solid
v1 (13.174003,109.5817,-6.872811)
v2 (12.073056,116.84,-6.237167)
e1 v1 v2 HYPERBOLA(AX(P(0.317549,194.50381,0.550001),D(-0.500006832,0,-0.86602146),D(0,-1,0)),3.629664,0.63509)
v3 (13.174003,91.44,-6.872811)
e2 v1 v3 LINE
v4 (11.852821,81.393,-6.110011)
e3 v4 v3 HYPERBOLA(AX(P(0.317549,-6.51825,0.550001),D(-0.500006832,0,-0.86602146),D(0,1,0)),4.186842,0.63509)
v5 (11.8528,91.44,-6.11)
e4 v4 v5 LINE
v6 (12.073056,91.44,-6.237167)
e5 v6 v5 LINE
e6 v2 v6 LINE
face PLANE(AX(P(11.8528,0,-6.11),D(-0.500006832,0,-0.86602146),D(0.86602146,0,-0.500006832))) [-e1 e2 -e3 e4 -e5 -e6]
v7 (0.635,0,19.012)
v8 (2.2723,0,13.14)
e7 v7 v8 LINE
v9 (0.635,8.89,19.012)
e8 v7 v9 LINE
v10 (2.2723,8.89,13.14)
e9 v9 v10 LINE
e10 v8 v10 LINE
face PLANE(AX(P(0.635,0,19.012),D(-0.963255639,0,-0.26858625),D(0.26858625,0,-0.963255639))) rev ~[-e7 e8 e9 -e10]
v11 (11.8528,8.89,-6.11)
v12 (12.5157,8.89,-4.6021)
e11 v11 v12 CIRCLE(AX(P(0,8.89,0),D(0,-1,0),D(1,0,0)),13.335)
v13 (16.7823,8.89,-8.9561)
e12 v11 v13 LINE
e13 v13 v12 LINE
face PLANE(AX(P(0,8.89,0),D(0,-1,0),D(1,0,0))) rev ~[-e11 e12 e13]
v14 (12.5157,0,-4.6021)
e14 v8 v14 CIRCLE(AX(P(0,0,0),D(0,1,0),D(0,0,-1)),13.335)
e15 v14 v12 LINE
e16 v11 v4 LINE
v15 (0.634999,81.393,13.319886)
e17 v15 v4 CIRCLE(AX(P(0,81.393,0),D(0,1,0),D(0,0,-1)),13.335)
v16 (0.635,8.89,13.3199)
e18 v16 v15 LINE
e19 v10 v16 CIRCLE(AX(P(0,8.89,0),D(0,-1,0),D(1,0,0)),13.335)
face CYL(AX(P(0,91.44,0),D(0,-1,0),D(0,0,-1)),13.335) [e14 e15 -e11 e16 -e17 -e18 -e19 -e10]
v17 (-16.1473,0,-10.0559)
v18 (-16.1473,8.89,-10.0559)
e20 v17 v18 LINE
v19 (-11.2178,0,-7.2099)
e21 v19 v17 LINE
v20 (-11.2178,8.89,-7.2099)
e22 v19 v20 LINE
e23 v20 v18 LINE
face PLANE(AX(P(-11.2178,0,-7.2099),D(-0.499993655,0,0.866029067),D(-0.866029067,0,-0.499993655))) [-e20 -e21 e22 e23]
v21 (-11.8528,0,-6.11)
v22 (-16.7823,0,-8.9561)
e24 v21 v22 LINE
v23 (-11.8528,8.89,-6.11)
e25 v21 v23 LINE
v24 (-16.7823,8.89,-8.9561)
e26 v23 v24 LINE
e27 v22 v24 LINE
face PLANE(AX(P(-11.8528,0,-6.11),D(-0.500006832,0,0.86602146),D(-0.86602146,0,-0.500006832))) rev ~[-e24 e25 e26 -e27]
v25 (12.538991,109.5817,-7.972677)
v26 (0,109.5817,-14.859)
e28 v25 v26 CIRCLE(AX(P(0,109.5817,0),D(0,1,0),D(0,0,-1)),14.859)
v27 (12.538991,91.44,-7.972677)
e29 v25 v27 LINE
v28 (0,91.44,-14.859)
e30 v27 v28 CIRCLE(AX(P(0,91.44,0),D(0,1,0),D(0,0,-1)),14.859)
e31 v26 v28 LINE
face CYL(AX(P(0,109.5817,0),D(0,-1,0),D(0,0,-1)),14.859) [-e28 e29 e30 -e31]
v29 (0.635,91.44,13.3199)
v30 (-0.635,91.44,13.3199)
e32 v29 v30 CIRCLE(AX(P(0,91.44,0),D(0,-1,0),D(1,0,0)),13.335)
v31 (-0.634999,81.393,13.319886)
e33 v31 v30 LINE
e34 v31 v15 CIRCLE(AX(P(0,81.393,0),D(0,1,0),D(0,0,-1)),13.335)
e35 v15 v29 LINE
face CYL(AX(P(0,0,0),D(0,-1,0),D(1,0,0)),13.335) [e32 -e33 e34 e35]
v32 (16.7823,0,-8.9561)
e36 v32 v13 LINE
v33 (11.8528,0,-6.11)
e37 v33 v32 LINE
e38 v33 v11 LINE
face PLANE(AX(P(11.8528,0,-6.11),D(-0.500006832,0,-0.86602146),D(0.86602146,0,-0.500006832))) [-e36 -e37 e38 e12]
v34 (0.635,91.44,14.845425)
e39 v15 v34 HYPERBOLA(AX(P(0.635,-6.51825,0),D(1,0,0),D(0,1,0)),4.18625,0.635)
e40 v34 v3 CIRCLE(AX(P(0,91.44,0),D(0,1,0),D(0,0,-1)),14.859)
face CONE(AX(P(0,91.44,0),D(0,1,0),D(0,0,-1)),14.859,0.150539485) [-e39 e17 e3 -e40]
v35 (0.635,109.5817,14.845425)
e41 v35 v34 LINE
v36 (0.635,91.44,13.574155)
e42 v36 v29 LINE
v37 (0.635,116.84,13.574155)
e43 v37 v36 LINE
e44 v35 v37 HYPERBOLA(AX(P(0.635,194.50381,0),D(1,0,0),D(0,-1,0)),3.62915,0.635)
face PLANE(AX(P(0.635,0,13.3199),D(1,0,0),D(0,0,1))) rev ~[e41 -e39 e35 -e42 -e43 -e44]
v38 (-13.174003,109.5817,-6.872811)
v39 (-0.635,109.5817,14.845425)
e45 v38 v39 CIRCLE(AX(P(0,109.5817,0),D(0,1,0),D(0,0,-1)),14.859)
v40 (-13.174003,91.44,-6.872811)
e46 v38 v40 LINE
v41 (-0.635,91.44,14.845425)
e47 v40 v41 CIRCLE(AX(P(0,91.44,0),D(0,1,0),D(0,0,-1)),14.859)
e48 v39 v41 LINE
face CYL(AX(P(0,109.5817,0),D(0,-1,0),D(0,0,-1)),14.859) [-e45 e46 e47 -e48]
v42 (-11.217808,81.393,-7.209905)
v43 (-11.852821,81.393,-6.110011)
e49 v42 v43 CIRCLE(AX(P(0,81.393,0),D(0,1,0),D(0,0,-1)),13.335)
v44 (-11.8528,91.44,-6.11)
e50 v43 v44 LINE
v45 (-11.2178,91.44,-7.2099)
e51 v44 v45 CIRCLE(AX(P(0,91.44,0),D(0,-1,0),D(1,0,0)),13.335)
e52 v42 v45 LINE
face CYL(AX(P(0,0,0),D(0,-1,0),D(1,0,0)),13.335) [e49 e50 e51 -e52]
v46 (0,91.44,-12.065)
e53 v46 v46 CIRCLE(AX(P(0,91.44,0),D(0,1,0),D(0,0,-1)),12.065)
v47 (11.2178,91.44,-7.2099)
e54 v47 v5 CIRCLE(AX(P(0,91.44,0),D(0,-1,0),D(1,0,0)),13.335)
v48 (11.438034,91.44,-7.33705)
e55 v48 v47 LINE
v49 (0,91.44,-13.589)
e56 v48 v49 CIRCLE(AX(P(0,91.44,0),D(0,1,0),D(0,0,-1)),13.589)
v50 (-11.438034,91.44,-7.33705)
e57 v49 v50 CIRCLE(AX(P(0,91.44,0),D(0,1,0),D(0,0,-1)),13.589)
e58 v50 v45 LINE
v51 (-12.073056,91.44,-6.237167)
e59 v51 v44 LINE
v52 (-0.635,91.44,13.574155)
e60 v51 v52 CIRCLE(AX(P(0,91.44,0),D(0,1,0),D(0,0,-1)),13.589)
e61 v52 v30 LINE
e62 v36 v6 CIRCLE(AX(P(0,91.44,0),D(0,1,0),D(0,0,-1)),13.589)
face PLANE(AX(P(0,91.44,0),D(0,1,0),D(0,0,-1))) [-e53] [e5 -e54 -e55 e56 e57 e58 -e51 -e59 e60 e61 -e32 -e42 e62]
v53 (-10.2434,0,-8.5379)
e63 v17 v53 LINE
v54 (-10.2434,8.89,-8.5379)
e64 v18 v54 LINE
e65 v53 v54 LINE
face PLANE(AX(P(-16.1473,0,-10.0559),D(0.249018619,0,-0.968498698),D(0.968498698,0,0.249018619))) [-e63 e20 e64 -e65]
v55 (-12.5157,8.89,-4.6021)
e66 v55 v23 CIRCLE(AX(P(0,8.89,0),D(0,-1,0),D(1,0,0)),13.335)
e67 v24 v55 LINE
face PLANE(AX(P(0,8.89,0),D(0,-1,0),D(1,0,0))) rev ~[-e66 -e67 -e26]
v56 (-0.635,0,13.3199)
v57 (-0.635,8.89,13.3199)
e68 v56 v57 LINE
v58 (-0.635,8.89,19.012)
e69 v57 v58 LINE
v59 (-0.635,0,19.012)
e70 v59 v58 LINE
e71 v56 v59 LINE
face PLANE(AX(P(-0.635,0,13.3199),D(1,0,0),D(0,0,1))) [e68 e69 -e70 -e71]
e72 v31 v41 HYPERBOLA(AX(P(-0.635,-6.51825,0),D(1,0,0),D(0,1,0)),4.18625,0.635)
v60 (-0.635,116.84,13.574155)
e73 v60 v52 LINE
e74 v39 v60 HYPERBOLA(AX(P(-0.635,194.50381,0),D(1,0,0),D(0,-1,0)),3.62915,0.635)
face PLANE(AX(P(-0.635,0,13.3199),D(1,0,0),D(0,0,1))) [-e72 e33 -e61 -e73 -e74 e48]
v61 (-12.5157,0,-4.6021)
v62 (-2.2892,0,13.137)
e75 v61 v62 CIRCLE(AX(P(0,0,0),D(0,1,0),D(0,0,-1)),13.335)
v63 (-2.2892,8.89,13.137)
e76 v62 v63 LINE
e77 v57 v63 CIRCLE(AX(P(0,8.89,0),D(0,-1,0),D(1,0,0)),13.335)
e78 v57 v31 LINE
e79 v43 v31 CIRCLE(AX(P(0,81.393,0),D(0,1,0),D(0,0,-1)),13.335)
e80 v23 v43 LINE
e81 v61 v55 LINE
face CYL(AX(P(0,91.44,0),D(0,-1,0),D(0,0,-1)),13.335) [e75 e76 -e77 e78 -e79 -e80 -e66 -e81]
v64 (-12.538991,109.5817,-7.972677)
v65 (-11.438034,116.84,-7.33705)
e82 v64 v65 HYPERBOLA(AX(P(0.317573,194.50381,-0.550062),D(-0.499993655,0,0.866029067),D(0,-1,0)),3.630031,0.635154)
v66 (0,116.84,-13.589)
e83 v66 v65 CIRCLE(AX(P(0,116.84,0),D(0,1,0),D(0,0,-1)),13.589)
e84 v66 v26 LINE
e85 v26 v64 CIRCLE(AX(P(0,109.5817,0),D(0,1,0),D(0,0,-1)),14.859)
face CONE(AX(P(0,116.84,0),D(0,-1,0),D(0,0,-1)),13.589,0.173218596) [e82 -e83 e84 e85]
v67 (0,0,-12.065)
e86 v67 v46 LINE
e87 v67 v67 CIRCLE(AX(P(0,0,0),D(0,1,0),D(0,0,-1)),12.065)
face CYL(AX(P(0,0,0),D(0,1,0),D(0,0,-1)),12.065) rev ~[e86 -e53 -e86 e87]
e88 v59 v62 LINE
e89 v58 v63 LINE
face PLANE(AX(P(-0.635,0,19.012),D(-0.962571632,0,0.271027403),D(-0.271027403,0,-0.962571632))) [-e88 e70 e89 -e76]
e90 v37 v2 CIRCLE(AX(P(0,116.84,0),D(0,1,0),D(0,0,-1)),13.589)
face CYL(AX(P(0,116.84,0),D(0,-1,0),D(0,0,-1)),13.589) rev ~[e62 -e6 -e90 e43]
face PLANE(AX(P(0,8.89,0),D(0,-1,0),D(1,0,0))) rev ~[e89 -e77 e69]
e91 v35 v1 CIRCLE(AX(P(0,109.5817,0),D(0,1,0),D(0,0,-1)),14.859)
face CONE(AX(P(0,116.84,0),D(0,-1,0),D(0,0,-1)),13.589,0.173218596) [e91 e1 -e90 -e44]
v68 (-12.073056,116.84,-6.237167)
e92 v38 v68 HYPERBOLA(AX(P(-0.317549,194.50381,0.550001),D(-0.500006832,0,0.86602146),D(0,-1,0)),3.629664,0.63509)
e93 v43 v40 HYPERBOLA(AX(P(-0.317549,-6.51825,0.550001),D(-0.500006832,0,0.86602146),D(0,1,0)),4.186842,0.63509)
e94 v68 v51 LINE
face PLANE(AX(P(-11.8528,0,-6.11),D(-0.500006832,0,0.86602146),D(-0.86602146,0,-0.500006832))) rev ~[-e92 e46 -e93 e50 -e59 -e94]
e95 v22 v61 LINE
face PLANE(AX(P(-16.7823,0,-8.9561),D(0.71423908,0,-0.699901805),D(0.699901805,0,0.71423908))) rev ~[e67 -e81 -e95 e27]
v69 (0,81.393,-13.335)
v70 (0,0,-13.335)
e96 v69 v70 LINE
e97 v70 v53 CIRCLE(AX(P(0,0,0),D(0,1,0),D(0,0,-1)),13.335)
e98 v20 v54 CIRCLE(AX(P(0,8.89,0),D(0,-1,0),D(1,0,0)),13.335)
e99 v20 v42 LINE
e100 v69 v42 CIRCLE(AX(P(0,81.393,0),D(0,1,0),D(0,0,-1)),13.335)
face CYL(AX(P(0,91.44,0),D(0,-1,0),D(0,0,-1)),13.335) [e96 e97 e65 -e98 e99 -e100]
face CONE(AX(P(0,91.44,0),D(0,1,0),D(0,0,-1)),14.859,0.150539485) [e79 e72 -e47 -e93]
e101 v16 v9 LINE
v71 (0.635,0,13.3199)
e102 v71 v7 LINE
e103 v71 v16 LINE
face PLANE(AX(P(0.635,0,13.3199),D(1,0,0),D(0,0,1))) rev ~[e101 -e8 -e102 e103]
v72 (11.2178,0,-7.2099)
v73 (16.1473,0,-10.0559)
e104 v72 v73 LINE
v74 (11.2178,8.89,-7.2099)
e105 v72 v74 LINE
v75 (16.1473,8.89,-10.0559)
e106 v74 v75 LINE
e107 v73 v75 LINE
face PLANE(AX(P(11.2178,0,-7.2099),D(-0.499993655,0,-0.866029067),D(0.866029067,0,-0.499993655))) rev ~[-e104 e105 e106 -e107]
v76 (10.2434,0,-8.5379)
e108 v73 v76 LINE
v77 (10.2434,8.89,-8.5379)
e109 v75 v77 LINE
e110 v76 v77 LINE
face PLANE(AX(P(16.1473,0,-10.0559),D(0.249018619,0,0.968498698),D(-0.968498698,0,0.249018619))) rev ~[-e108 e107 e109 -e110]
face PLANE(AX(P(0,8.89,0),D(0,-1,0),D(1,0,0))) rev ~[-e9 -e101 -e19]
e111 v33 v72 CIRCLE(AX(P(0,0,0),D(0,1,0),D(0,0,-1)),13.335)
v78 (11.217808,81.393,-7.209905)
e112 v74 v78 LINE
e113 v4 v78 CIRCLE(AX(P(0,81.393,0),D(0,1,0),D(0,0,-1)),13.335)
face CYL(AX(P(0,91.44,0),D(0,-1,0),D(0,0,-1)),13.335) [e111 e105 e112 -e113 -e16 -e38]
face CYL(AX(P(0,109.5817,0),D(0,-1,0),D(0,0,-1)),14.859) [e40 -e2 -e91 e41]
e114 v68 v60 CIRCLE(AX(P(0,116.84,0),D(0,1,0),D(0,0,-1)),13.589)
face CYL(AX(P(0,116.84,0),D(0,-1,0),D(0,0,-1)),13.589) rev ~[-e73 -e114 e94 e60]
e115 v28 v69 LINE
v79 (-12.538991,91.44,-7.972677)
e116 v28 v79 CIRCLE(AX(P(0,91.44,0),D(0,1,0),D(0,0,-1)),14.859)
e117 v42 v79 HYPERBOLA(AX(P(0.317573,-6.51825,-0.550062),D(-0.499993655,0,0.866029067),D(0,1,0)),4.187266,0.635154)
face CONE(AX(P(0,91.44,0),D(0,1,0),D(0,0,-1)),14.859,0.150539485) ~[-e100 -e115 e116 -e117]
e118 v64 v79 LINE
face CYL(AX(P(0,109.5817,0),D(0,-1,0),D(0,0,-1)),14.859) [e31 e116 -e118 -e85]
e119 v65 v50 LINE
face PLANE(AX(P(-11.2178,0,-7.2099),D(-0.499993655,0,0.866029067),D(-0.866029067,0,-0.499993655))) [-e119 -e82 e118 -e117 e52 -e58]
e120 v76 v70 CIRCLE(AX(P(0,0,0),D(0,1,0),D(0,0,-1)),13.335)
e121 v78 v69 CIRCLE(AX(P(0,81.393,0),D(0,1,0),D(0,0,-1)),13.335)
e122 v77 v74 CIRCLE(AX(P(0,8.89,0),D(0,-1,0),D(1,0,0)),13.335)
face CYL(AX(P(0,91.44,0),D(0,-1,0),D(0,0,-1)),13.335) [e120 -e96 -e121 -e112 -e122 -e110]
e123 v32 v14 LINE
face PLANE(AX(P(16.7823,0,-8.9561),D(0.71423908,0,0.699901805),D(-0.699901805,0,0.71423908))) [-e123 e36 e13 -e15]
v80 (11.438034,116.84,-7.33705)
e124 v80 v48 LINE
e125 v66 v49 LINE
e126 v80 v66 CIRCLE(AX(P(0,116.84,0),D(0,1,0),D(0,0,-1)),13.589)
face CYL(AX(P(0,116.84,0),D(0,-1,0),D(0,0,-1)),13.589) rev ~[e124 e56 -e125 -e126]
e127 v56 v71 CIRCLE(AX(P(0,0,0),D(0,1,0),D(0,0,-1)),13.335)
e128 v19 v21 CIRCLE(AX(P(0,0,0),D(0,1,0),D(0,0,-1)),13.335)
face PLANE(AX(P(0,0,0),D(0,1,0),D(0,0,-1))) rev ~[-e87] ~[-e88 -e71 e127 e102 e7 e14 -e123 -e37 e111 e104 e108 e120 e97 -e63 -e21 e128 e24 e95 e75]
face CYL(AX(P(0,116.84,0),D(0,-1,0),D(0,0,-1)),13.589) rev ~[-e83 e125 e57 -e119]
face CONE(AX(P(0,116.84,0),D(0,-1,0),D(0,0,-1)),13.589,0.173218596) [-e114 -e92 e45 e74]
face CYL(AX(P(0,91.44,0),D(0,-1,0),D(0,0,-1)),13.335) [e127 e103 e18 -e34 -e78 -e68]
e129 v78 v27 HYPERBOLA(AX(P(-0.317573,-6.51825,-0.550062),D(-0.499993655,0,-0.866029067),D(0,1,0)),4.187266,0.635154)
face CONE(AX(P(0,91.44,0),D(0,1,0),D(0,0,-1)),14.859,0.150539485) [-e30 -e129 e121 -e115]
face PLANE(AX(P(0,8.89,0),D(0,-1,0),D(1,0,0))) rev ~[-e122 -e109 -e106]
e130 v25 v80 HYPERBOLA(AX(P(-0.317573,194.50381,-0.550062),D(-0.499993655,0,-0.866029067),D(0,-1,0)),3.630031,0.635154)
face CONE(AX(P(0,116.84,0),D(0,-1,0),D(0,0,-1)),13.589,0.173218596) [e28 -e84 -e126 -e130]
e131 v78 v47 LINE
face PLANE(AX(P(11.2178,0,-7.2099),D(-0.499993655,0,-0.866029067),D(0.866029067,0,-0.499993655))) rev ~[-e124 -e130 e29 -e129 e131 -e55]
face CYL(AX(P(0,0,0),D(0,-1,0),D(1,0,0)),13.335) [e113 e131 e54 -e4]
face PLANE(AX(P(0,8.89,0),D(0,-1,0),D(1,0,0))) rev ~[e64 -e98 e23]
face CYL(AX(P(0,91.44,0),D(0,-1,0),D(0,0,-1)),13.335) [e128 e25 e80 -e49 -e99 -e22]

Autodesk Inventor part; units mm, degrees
ref_plane "YZ Plane" through (0, 0, 0) normal (1, 0, 0) x (0, 1, 0)
ref_plane "XZ Plane" through (0, 0, 0) normal (0, 1, 0) x (-1, 0, 0)
sketch "Sketch1" plane through (0, 0, 0) normal (1, 0, 0) x (0, 1, 0)
  line L0 (0, 0) -> (0, -12.065)
  line L1 (0, -12.065) -> (91.44, -12.065)
  line L2 (91.44, -13.335) -> (0, -13.335)
  line L3 (0, -13.335) -> (0, -12.065)
  line L4 (0, 0) -> (110.5631, 0)
  line L5 (116.84, 0) -> (116.84, -13.589)
  line L6 (116.84, -13.589) -> (91.44, -13.589)
  line L7 (116.84, -13.589) -> (142.24, -13.589) construction
  line L8 (109.5817, -14.859) -> (91.44, -14.859)
  line L9 (91.44, -14.859) -> (81.393, -13.335)
  line L10 (91.44, -13.589) -> (91.44, -12.065)
  line L11 (116.84, -13.589) -> (109.5817, -14.859)
  point P0 (73.3806, -13.335)
  dimension "d0" = 12.065
  dimension "d1" = 91.44
  dimension "d39" = 13.589
  dimension "d41" = 180
ref_plane "Work Plane1" through (0, 0, 0) normal (0, -1, 0) x (1, 0, 0)
sketch "Sketch2" plane through (0, 0, 0) normal (0, -1, 0) x (1, 0, 0)
  circle A0 centre (0, 0) radius 13.335
  line L0 (11.2178, -7.2099) -> (16.1473, -10.0559)
  line L1 (11.8528, -6.11) -> (16.7823, -8.9561)
  line L2 (0.635, 13.3199) -> (0.635, 19.012)
  line L3 (-0.635, 13.3199) -> (-0.635, 19.012)
  line L4 (-11.8528, -6.11) -> (-16.7823, -8.9561)
  line L5 (-11.2178, -7.2099) -> (-16.1473, -10.0559)
  line L6 (16.1473, -10.0559) -> (16.7823, -8.9561)
  line L7 (0.635, 19.012) -> (-0.635, 19.012)
  line L8 (-16.7823, -8.9561) -> (-16.1473, -10.0559)
  line L9 (-0.635, 19.012) -> (-2.2892, 13.137)
  circle A1 centre (0, 0) radius 13.335 projected
  line L10 (0.635, 19.012) -> (2.2723, 13.14)
  line L11 (16.7823, -8.9561) -> (12.5157, -4.6021)
  line L12 (-16.1473, -10.0559) -> (-10.2434, -8.5379)
  line L13 (-16.7823, -8.9561) -> (-12.5157, -4.6021)
  line L14 (16.1473, -10.0559) -> (10.2434, -8.5379)
  dimension "d24" = 6.096
  dimension "d25" = 6.096
  dimension "d27" = 6.096
  dimension "d28" = 6.096
  dimension "d29" = 6.096
extrude "Extrusion1" add sketch "Sketch2" against normal blind 8.89 contours A0 L2 L10 | L11 L1 A0 | A0 L9 L3 | L0 L14 A0 | A0 L4 L13 | L12 L5 A0
extrude "Extrusion2" cut sketch "Sketch2" against normal blind 124.7775 contours A0 L3 L7 L2 | L1 L6 L0 A0 | A0 L5 L8 L4
revolve "Revolution2" add sketch "Sketch1" angle 360 about axis through (0, 0, 0) along (0, 1, 0)
extrude "Extrusion3" cut sketch "Sketch2" against normal blind 174.625 contours A0 L3 L7 L2 | L1 L6 L0 A0 | A0 L5 L8 L4
properties part number "Engine_Holder_Mk_III" material "ABS Plastic"
